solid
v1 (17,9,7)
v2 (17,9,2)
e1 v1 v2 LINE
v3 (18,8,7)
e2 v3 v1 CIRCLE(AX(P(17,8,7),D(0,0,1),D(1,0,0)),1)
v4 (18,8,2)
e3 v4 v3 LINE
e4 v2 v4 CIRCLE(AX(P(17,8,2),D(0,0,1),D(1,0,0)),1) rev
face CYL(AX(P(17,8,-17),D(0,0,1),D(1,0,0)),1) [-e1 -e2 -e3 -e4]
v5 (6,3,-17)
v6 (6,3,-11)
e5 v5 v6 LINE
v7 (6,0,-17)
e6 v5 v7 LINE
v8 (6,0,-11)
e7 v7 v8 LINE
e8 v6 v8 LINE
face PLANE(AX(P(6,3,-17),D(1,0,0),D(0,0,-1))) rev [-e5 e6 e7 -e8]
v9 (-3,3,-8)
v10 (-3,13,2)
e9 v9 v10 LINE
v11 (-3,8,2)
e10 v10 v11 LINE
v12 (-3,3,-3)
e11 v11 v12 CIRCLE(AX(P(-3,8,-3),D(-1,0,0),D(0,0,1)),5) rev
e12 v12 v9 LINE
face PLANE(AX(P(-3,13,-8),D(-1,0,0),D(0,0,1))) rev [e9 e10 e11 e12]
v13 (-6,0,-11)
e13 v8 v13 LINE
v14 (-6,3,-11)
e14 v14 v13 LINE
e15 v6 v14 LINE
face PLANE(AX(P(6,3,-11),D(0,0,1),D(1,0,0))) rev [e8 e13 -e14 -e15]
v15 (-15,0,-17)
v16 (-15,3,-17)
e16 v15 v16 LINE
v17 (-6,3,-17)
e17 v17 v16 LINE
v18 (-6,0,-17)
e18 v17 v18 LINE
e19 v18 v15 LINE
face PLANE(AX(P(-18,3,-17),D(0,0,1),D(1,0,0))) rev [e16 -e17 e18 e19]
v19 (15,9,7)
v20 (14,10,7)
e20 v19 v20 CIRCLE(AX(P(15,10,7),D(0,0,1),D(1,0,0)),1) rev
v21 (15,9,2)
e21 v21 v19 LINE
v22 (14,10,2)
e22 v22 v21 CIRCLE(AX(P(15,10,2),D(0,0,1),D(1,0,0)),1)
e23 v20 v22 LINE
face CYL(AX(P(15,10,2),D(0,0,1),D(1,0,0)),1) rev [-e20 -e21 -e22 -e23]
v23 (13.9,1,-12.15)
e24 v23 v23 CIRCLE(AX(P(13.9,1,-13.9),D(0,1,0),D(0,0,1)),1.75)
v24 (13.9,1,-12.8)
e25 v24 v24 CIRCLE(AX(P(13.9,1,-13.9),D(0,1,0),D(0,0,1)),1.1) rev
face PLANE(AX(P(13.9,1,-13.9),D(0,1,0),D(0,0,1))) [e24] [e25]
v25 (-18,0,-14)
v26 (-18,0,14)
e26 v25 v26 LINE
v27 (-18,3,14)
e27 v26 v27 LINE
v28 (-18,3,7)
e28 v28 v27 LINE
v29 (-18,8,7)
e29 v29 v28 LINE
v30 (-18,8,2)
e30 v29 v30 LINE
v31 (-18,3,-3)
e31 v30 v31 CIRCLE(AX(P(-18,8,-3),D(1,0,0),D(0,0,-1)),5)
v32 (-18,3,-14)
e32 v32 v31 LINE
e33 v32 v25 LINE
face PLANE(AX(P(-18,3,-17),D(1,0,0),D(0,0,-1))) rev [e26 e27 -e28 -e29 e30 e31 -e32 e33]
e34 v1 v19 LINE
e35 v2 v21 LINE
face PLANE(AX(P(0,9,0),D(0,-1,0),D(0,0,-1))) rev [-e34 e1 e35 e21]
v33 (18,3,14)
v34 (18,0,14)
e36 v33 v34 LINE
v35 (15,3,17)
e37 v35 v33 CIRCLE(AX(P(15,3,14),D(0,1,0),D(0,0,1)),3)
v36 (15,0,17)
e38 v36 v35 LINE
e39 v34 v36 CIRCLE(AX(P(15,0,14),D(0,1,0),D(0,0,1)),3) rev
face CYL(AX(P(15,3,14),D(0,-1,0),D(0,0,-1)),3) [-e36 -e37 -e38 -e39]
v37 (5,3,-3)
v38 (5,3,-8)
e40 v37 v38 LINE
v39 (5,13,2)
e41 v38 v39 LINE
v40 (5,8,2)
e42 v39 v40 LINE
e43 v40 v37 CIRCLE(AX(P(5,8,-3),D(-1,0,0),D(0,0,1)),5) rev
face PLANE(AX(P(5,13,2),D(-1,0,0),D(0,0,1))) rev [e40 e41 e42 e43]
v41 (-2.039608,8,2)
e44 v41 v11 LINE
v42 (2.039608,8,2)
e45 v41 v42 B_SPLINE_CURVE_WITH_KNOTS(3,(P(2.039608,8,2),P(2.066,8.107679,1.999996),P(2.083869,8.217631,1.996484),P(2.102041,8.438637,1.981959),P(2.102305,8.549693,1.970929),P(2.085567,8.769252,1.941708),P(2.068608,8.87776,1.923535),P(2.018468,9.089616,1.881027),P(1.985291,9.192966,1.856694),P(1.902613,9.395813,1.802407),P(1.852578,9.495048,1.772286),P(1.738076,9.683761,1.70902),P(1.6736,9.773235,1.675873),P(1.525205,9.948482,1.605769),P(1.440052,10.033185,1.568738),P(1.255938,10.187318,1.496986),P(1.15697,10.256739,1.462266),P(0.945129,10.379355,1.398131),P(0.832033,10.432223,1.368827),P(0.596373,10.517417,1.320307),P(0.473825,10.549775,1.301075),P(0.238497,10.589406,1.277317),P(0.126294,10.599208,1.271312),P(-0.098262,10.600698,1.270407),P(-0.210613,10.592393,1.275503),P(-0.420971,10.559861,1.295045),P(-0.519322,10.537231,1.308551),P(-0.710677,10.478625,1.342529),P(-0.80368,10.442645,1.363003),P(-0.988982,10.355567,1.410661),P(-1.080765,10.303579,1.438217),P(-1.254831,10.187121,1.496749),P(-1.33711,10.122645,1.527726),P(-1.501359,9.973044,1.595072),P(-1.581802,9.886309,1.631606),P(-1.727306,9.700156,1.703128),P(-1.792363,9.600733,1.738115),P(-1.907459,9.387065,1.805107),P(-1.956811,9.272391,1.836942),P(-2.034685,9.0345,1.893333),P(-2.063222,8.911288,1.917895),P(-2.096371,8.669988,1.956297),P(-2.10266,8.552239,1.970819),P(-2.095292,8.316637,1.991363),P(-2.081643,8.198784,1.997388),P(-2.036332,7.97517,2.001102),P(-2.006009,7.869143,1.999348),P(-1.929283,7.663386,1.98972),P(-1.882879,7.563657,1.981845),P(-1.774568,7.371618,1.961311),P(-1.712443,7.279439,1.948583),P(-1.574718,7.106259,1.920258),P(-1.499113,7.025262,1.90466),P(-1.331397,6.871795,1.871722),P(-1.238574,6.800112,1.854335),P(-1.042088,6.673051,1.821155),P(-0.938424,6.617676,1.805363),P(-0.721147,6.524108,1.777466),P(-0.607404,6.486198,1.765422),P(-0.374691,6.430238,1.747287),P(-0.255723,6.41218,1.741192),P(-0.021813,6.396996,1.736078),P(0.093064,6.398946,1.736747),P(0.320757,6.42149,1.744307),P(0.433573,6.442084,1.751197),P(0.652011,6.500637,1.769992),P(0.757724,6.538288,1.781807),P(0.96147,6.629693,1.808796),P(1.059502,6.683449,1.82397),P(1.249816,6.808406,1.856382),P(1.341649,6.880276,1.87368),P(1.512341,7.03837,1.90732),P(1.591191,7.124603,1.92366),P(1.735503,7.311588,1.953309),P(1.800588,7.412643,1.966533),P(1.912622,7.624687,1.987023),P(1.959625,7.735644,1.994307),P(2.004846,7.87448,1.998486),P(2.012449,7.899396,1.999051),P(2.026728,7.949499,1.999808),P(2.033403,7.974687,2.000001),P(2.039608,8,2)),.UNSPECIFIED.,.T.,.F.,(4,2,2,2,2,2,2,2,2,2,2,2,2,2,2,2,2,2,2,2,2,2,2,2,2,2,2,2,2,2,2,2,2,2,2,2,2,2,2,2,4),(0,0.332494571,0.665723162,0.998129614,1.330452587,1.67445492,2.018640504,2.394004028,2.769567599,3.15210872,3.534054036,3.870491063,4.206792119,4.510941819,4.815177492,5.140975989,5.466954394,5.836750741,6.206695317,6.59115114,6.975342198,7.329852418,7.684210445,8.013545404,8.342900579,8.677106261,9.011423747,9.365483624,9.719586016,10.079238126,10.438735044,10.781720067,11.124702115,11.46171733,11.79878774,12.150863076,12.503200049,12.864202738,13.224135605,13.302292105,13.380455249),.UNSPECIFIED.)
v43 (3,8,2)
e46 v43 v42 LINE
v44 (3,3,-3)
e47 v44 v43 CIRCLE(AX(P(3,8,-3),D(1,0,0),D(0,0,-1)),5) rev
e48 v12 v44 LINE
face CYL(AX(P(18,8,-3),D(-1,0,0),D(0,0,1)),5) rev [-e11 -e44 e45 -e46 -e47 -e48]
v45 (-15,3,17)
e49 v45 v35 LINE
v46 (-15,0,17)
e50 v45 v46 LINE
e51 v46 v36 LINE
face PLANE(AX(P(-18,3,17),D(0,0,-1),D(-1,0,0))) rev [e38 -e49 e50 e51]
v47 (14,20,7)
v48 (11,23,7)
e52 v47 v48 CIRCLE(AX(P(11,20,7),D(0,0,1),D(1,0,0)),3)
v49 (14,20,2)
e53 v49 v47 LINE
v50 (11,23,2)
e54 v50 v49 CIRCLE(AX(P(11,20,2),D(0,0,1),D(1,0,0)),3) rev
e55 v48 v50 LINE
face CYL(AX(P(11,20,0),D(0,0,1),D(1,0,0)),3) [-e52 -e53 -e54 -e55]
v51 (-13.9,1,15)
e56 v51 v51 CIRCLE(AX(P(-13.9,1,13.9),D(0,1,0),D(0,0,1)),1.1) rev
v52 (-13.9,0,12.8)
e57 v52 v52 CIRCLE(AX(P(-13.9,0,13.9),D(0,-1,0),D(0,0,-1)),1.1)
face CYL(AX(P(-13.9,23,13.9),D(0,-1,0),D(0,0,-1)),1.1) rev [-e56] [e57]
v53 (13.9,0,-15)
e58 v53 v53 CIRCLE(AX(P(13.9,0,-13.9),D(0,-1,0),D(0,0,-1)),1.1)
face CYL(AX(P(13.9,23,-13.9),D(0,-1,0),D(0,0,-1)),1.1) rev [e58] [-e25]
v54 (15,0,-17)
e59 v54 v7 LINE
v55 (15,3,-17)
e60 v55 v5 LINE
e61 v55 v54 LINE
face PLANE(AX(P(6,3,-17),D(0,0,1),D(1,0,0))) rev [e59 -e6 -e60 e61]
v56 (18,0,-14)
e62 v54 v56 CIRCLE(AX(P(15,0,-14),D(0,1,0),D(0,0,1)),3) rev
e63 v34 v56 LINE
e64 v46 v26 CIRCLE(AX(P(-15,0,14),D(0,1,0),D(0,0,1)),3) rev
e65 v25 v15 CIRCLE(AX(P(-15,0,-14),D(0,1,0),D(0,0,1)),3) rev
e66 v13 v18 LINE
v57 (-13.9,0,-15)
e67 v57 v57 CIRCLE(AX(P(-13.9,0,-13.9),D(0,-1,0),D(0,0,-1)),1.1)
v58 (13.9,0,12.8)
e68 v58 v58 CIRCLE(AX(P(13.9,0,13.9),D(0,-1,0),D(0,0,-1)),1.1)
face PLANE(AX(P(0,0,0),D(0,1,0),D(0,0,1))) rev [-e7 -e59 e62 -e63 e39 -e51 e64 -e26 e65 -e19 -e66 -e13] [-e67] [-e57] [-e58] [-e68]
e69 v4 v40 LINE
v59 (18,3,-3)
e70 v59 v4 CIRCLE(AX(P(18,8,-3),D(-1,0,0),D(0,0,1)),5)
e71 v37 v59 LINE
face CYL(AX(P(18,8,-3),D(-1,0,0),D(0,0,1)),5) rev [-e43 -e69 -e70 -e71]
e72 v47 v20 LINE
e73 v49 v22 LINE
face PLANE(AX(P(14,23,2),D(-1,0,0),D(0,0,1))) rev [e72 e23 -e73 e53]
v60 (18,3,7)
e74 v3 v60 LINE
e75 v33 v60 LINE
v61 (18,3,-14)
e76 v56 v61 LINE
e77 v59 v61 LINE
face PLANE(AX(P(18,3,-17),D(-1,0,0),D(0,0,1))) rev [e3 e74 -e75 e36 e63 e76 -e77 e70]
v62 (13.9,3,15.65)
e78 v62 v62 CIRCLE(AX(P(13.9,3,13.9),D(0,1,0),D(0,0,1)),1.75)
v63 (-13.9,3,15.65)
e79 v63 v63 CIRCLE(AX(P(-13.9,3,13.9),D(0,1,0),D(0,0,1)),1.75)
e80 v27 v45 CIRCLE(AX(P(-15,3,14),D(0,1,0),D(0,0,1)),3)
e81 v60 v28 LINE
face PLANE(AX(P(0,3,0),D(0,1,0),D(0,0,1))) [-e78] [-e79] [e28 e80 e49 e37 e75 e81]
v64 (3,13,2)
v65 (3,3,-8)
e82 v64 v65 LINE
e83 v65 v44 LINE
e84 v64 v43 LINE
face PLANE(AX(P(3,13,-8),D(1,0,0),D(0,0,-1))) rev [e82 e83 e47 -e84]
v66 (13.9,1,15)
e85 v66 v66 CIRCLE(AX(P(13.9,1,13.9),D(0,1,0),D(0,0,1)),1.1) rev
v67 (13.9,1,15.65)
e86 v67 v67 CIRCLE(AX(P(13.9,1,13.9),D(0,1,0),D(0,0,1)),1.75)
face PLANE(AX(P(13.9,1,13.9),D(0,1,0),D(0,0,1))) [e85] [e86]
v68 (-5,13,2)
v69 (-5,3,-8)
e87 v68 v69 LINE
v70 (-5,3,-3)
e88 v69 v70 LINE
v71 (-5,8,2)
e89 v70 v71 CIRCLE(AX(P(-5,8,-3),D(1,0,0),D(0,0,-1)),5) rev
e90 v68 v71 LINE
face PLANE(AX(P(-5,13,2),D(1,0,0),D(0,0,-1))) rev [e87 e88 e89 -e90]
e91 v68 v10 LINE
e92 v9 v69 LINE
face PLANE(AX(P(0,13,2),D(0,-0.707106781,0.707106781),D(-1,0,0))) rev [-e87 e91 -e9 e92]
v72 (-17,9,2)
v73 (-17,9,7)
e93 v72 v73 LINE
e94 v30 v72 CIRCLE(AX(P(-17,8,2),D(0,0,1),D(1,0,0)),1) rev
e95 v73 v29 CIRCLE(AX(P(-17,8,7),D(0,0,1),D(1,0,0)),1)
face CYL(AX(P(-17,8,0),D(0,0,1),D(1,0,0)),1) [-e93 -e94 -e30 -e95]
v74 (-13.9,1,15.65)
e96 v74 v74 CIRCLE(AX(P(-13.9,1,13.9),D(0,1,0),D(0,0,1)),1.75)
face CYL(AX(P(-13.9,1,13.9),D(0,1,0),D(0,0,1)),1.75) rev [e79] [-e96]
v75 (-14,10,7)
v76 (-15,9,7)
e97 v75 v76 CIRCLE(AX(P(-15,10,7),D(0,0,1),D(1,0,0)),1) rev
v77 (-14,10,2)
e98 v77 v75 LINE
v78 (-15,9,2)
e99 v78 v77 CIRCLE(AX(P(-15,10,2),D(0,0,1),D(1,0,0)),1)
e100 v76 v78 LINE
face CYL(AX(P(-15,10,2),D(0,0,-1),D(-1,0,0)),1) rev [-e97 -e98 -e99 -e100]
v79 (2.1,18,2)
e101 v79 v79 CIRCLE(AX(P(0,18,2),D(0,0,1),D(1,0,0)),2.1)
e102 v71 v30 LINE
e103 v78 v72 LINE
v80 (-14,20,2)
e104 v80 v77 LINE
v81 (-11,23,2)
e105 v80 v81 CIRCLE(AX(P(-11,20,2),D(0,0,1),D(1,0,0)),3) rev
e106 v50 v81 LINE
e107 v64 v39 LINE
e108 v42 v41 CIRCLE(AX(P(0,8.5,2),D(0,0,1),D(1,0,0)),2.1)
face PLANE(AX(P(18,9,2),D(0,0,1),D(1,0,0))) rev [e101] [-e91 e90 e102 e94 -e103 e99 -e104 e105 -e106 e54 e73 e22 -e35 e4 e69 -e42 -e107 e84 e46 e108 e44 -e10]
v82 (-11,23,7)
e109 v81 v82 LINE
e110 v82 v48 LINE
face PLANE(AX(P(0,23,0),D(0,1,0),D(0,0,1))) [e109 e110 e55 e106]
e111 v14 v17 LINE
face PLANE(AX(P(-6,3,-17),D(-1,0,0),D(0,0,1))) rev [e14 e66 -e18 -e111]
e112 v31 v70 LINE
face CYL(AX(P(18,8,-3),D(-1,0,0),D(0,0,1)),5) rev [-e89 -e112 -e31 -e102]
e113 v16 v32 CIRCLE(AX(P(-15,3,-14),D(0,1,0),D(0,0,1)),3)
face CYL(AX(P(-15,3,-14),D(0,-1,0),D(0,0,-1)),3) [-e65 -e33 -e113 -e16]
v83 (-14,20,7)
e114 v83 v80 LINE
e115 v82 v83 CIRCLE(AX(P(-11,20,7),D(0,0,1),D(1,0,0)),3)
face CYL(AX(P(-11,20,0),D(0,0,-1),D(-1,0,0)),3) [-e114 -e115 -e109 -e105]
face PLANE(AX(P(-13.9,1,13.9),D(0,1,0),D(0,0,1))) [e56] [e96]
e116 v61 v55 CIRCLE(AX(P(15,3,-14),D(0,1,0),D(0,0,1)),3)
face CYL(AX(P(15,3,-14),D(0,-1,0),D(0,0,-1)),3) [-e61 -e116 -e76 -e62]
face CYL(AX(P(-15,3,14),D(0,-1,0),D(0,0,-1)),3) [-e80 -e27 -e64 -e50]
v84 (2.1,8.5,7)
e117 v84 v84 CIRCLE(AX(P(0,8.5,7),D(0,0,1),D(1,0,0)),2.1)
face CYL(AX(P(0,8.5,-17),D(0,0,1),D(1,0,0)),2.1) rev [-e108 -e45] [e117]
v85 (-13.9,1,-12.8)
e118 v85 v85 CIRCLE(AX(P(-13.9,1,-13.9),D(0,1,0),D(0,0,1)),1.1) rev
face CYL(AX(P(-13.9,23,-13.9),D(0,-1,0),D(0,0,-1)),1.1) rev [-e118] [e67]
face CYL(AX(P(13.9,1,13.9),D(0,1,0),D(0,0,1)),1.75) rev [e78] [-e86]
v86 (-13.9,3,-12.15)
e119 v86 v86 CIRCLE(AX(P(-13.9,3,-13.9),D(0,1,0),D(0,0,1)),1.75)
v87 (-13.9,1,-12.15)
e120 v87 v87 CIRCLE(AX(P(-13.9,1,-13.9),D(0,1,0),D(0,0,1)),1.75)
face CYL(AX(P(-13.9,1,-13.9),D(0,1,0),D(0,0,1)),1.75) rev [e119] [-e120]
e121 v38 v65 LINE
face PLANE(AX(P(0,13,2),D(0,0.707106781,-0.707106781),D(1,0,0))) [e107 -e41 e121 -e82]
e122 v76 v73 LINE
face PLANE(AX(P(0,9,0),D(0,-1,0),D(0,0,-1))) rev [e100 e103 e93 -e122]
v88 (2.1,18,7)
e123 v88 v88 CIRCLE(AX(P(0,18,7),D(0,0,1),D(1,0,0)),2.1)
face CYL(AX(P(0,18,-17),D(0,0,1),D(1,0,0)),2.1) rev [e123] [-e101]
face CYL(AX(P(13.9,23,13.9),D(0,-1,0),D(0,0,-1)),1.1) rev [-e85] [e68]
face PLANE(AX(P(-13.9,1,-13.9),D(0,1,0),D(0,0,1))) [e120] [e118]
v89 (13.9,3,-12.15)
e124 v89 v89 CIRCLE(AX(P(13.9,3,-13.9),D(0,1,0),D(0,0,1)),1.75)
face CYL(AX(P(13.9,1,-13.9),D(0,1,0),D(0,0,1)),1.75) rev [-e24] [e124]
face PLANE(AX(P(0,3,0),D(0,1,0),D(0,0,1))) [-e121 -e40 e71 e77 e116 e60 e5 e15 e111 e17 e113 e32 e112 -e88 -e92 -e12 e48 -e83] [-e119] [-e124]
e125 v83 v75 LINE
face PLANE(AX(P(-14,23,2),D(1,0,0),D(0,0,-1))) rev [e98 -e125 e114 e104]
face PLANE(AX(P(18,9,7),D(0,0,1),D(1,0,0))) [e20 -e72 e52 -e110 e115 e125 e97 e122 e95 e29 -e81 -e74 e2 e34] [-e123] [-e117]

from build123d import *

# Parameters (mm, degrees)
EXTRUDE_1_DEPTH     = 3
SKETCH_3_W          = 36
SKETCH_3_H          = 5
EXTRUDE_3_DEPTH     = 6
SKETCH_4_W          = 28
SKETCH_4_H          = 5
EXTRUDE_4_DEPTH     = 14
SKETCH_6_W          = 2
SKETCH_6_H          = 10
EXTRUDE_6_DEPTH     = 10
CHAMFER_1_SIZE      = 10
FILLET_2_R          = 5
SKETCH_12_R         = 2.1
CUT_EXTRUDE_3_DEPTH = 38.802116343
SKETCH_2_R          = 1.1
CUT_EXTRUDE_4_DEPTH = 34.793490497
SKETCH_13_R         = 1.75
CUT_EXTRUDE_5_DEPTH = 2
FILLET_3_R          = 3
FILLET_4_R          = 1


with BuildPart() as part:
    # 草图1 → 凸台-拉伸1 (new body)
    with BuildSketch(Plane(origin=(0, 0, 0), x_dir=(1, 0, 0), z_dir=(0, 1, 0))):
        Polygon((6, 17), (18, 17), (18, -17), (-18, -17), (-18, 17), (-6, 17), (-6, 11), (6, 11), align=None)
    extrude(amount=EXTRUDE_1_DEPTH)

    # 草图3 → 凸台-拉伸3 (add)
    with BuildSketch(Plane(origin=(0, 3, 0), x_dir=(1, 0, 0), z_dir=(0, 1, 0))):
        with Locations((0, -4.5)):
            Rectangle(SKETCH_3_W, SKETCH_3_H)
    extrude(amount=EXTRUDE_3_DEPTH)

    # 草图4 → 凸台-拉伸4 (add)
    with BuildSketch(Plane(origin=(0, 9, 0), x_dir=(1, 0, 0), z_dir=(0, 1, 0))):
        with Locations((0, -4.5)):
            Rectangle(SKETCH_4_W, SKETCH_4_H)
    extrude(amount=EXTRUDE_4_DEPTH)

    # 草图6 → 凸台-拉伸6 (add)
    with BuildSketch(Plane(origin=(0, 3, 0), x_dir=(1, 0, 0), z_dir=(0, 1, 0))):
        with Locations((4, 3)):
            Rectangle(SKETCH_6_W, SKETCH_6_H)
        with Locations((-4, 3)):
            Rectangle(SKETCH_6_W, SKETCH_6_H)
    extrude(amount=EXTRUDE_6_DEPTH)

    # 倒角1
    chamfer_1_edges = [part.edges().sort_by_distance(p)[0] for p in [
        (4, 13, -8),
        (-4, 13, -8),
    ]]
    chamfer(chamfer_1_edges, length=CHAMFER_1_SIZE - 0.0001)  # a hair under: the kernel refuses the full size

    # 圆角2
    fillet_2_edges = [part.edges().sort_by_distance(p)[0] for p in [
        (11.5, 3, 2),
        (0, 3, 2),
        (-11.5, 3, 2),
    ]]
    fillet(fillet_2_edges, radius=FILLET_2_R)

    # 草图12 → 切除-拉伸3 (cut, through all)
    with BuildSketch(Plane.XY.offset(7)):
        with Locations((0, 18)):
            Circle(SKETCH_12_R)
        with Locations((0, 8.5)):
            Circle(SKETCH_12_R)
    extrude(amount=-CUT_EXTRUDE_3_DEPTH, mode=Mode.SUBTRACT)

    # 草图2 → 切除-拉伸4 (cut, through all)
    with BuildSketch(Plane.XZ):
        with Locations(Location((-13.9, 13.9, 0), (0, 0, 270))):
            Circle(SKETCH_2_R)
        with Locations(Location((13.9, 13.9, 0), (0, 0, 270))):
            Circle(SKETCH_2_R)
        with Locations(Location((-13.9, -13.9, 0), (0, 0, 270))):
            Circle(SKETCH_2_R)
        with Locations(Location((13.9, -13.9, 0), (0, 0, 270))):
            Circle(SKETCH_2_R)
    extrude(amount=-CUT_EXTRUDE_4_DEPTH, mode=Mode.SUBTRACT)

    # 草图13 → 切除-拉伸5 (cut)
    with BuildSketch(Plane(origin=(0, 3, 0), x_dir=(1, 0, 0), z_dir=(0, 1, 0))):
        with Locations(Location((-13.9, 13.9, 0), (0, 0, 270))):
            Circle(SKETCH_13_R)
        with Locations(Location((13.9, 13.9, 0), (0, 0, 270))):
            Circle(SKETCH_13_R)
        with Locations(Location((-13.9, -13.9, 0), (0, 0, 270))):
            Circle(SKETCH_13_R)
        with Locations(Location((13.9, -13.9, 0), (0, 0, 270))):
            Circle(SKETCH_13_R)
    extrude(amount=-CUT_EXTRUDE_5_DEPTH, mode=Mode.SUBTRACT)

    # 圆角3
    fillet_3_edges = [part.edges().sort_by_distance(p)[0] for p in [
        (-18, 1.5, -17),
        (18, 1.5, -17),
        (18, 1.5, 17),
        (-18, 1.5, 17),
        (-14, 23, 4.5),
        (14, 23, 4.5),
    ]]
    fillet(fillet_3_edges, radius=FILLET_3_R)

    # 圆角4
    fillet_4_edges = [part.edges().sort_by_distance(p)[0] for p in [
        (18, 9, 4.5),
        (14, 9, 4.5),
        (-18, 9, 4.5),
        (-14, 9, 4.5),
    ]]
    fillet(fillet_4_edges, radius=FILLET_4_R)


solid = part.part
